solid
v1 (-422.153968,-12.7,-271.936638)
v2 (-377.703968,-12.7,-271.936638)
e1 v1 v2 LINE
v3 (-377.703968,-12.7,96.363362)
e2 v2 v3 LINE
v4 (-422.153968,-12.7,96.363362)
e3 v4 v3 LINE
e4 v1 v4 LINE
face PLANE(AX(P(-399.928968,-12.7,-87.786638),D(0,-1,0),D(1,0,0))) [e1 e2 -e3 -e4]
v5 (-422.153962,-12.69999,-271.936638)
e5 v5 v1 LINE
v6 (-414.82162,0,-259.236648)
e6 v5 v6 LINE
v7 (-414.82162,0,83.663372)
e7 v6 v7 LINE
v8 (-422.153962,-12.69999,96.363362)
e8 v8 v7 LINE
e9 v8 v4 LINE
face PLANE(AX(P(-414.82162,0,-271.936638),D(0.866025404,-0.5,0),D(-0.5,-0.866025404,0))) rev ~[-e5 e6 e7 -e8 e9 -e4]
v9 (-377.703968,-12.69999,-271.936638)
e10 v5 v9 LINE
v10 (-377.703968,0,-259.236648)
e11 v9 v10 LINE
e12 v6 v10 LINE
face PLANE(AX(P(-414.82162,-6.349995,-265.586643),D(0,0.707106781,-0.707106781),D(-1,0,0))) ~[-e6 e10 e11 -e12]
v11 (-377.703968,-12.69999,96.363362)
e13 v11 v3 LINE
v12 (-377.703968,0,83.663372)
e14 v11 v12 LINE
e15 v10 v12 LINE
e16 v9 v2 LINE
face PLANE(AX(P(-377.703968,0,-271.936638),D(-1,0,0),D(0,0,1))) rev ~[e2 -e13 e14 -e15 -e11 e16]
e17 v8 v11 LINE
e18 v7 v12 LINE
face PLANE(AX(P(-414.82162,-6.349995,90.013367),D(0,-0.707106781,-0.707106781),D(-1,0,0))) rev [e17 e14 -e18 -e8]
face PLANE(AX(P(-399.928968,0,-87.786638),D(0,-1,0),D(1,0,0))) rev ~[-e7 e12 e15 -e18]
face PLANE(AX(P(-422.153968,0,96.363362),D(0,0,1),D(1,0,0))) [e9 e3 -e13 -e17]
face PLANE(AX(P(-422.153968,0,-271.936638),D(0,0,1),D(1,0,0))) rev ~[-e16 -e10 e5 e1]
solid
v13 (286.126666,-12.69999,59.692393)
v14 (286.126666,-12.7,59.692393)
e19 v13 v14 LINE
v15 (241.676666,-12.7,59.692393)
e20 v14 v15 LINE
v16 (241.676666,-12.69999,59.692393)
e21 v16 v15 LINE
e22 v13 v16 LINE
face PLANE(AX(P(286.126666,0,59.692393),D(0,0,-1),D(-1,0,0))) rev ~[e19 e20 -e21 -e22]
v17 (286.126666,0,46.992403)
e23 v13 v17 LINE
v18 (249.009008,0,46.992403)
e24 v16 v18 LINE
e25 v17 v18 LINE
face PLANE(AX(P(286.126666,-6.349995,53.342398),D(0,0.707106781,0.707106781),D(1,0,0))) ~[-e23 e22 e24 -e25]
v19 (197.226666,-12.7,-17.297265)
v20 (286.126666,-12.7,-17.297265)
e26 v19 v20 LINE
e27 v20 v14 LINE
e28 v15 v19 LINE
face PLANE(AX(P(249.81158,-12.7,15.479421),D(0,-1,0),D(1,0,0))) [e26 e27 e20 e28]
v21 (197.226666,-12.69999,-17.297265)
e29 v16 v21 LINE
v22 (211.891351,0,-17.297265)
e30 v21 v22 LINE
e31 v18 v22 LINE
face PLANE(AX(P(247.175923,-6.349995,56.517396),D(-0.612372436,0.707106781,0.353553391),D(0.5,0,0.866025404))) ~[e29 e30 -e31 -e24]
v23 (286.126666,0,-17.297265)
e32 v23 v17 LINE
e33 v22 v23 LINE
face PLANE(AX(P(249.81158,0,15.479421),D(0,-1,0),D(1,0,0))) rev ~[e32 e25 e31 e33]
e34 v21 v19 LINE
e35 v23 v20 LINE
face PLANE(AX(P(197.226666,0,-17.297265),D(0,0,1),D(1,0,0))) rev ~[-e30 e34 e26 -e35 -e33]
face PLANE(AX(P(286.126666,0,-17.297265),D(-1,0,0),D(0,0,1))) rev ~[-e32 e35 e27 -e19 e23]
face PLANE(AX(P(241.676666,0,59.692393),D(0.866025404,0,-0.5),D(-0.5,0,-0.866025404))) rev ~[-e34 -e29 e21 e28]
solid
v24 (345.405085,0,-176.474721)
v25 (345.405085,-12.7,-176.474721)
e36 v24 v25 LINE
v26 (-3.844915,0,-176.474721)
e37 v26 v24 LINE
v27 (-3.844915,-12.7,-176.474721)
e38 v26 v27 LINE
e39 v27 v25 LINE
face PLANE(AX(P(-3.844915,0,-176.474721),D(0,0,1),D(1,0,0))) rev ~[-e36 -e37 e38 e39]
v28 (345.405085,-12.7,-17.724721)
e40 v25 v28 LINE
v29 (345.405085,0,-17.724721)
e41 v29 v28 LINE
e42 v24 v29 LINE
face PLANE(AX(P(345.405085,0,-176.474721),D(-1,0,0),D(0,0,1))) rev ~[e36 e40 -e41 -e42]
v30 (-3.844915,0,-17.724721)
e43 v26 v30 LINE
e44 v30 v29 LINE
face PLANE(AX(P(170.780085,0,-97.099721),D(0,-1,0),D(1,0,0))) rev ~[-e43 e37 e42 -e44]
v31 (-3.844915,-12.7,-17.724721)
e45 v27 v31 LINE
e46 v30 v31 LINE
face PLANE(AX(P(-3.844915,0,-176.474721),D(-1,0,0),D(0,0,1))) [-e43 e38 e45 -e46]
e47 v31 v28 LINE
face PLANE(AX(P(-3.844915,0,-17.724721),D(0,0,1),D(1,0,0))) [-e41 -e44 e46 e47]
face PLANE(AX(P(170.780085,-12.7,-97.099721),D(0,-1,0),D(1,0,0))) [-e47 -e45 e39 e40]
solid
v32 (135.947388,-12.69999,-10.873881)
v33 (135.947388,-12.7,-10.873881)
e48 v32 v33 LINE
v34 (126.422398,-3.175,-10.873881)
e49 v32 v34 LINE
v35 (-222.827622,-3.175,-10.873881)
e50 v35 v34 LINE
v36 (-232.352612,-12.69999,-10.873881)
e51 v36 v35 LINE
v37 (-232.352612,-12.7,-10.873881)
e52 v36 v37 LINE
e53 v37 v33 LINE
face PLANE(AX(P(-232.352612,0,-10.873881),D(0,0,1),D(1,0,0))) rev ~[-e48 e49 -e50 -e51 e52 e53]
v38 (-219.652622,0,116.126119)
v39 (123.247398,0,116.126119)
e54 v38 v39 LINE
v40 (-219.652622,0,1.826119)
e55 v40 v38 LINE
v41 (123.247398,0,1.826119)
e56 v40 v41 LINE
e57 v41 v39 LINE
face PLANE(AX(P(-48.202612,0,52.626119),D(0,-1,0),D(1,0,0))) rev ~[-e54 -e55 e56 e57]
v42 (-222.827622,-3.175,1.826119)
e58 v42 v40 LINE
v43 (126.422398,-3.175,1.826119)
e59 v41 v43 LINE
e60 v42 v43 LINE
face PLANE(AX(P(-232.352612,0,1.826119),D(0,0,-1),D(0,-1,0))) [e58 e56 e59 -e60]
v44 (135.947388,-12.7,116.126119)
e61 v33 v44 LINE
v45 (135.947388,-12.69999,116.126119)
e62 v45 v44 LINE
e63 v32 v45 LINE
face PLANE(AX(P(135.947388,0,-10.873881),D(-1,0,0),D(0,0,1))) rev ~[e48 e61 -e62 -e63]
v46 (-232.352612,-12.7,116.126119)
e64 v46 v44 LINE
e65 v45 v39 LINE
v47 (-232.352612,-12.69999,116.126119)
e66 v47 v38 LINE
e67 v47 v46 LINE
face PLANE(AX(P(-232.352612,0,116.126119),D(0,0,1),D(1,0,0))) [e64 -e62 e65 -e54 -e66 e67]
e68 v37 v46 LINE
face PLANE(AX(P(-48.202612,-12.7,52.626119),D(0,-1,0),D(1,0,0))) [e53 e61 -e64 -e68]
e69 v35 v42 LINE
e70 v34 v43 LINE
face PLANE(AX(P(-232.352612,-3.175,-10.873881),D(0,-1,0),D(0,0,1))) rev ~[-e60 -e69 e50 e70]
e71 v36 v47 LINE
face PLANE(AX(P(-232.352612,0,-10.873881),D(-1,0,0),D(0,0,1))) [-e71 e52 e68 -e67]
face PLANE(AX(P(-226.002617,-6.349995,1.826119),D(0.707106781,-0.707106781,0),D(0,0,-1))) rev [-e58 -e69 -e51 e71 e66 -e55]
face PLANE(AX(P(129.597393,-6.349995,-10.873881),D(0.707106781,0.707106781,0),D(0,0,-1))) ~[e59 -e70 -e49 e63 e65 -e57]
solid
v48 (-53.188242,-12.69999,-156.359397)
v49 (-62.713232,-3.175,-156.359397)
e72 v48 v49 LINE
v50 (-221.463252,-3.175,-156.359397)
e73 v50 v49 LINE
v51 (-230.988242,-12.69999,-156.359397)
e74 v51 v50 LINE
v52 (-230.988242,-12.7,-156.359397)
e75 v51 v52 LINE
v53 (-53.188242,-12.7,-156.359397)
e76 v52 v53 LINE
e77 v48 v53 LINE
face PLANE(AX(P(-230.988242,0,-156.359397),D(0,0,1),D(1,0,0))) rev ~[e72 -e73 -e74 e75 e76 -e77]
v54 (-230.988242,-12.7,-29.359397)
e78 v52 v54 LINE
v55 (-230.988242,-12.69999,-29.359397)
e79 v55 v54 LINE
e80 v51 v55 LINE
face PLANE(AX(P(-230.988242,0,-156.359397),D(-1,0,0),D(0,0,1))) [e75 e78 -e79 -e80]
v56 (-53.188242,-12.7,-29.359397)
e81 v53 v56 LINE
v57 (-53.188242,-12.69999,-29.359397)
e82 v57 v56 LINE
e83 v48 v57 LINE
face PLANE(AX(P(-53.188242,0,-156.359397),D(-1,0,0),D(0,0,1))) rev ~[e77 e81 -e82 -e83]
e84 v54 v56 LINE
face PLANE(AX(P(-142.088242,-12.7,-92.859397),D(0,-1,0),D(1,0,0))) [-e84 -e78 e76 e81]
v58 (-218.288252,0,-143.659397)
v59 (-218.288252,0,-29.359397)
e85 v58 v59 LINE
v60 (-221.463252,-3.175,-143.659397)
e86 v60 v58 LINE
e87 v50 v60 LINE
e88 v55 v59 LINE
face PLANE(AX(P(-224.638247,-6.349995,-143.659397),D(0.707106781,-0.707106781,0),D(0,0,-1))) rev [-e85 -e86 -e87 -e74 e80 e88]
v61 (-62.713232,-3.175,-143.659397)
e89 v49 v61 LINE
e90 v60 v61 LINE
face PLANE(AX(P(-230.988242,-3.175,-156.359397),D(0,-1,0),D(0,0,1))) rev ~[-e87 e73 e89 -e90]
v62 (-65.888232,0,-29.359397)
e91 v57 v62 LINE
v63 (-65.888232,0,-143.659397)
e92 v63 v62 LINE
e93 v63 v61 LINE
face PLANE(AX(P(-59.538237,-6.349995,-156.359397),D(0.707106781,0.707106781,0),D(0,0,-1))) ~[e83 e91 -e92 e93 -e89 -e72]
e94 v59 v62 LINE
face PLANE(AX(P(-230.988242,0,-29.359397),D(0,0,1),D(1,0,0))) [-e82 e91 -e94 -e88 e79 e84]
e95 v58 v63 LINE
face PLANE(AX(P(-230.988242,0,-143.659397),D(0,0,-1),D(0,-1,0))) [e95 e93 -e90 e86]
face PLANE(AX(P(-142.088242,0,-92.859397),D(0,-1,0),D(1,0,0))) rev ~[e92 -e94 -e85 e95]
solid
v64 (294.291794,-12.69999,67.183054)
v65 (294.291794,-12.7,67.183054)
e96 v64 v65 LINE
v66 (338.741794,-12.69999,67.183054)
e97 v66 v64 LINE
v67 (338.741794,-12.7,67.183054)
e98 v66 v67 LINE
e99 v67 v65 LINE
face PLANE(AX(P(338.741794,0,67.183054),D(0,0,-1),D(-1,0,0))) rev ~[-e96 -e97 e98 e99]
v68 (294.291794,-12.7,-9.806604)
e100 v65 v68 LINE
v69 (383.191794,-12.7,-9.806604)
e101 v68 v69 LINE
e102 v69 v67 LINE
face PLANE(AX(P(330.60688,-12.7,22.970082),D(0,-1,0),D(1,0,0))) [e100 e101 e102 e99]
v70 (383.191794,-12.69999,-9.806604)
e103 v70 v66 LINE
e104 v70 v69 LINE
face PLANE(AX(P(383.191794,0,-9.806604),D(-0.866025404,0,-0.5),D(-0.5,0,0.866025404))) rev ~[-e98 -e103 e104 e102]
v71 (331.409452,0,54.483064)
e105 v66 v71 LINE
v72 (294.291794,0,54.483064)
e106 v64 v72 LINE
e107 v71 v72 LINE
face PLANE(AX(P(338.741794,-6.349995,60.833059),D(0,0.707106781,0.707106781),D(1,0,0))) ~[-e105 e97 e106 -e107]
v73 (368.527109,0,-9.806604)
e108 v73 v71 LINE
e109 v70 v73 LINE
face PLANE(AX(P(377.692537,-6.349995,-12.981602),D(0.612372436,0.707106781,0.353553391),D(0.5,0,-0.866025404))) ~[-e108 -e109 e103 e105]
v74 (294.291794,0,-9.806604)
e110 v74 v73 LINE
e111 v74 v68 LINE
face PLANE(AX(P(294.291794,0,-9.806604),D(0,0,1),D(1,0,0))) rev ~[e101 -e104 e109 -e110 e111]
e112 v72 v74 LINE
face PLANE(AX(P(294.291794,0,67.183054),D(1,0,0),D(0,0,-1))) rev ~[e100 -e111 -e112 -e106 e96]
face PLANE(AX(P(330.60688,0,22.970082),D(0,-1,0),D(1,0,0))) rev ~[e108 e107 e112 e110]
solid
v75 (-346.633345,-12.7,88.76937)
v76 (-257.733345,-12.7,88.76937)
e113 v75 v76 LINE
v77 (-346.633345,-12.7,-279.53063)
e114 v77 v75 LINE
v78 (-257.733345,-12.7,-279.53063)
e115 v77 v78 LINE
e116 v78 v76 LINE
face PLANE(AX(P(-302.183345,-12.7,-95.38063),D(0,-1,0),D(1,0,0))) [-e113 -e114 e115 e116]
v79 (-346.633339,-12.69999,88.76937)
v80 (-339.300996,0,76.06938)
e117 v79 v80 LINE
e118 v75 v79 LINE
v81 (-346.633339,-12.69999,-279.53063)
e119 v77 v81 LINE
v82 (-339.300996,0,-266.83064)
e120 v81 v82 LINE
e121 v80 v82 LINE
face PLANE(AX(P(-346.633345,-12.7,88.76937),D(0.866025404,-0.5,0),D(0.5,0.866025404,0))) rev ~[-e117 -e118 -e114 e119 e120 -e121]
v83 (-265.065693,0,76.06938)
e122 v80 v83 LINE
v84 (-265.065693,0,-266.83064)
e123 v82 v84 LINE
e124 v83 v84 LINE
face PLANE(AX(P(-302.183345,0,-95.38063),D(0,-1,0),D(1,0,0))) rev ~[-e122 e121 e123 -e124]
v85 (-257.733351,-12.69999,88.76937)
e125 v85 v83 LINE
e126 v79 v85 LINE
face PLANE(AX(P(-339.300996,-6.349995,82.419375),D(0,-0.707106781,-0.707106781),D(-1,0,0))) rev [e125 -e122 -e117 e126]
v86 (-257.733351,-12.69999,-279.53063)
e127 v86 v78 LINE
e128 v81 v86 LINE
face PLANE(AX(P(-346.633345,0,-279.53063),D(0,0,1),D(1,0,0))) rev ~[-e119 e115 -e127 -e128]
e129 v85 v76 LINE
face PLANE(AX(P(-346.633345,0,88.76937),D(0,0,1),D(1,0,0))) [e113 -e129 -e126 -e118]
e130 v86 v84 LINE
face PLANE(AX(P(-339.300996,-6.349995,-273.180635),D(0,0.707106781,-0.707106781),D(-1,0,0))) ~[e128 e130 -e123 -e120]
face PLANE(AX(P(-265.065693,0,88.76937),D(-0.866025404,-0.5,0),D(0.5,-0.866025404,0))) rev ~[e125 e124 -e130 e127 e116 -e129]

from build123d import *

# Parameters (mm, degrees)
F0_W      = 368.3
F0_H      = 127
F1_DEPTH  = 12.7
F2_W      = 177.8
F2_H      = 127
F3_DEPTH  = 12.7
F4_SIZE   = 12.69999
F5_SIZE   = 12.69999
F6_W      = 3.175
F6_H      = 12.7
F7_DEPTH  = 368.3
F8_W      = 3.175
F8_H      = 12.7
F9_DEPTH  = 368.3
F10_SIZE  = 12.69999
F11_SIZE  = 12.69999
F12_W     = 349.25
F12_H     = 158.75
F13_DEPTH = 12.7
F14_W     = 44.45
F14_H     = 368.3
F15_DEPTH = 12.7
F17_DEPTH = 12.7
F18_SIZE  = 12.69999
F20_DEPTH = 368.3
F21_SIZE  = 12.69999
F22_W     = 88.9
F22_H     = 368.3
F23_DEPTH = 12.7
F25_DEPTH = 368.3
F27_DEPTH = 12.7
F28_SIZE  = 12.69999
F29_SIZE  = 12.69999


# Not quite as in the source:
# - a fillet or chamfer is up to 0.001 mm smaller than in the source, because OpenCascade refuses the exact size
# - a feature names something its author has since deleted; it is built from what else it names


with BuildPart() as f1:
    # F0 (on Front) → F1 (new body)
    with BuildSketch(Plane.XZ):
        with Locations((-48.202611506, 52.6261187441)):
            Rectangle(F0_W, F0_H)
    extrude(amount=F1_DEPTH)

    # F4 (size 12.7 in the source; OpenCascade refuses exactly that, so slightly less here)
    f4_edges = [f1.edges().sort_by_distance(p)[0] for p in [
        (135.947388, 0, 52.626119),
    ]]
    chamfer(f4_edges, length=F4_SIZE)

    # F6 (on face) → F7 (cut)
    with BuildSketch(Plane(origin=(-232.352611506, 0, 0), x_dir=(0, -1, 0), z_dir=(-1, 0, 0))):
        with Locations((1.5875, -4.5238812559)):
            Rectangle(F6_W, F6_H)
    extrude(amount=-F7_DEPTH, mode=Mode.SUBTRACT)

    # F10 (size 12.7 in the source; OpenCascade refuses exactly that, so slightly less here)
    f10_edges = [f1.edges().sort_by_distance(p)[0] for p in [
        (-232.352612, 0, 58.976119),
    ]]
    chamfer(f10_edges, length=F10_SIZE)


with BuildPart() as f3:
    # F2 (on Front) → F3 (new body)
    with BuildSketch(Plane.XZ):
        with Locations((-142.0882418752, -92.8593969557)):
            Rectangle(F2_W, F2_H)
    extrude(amount=F3_DEPTH)

    # F5 (size 12.7 in the source; OpenCascade refuses exactly that, so slightly less here)
    f5_edges = [f3.edges().sort_by_distance(p)[0] for p in [
        (-53.188242, 0, -92.859397),
    ]]
    chamfer(f5_edges, length=F5_SIZE)

    # F8 (on face) → F9 (cut)
    with BuildSketch(Plane(origin=(-230.9882418752, 0, 0), x_dir=(0, -1, 0), z_dir=(-1, 0, 0))):
        with Locations((1.5875, -150.0093969557)):
            Rectangle(F8_W, F8_H)
    extrude(amount=-F9_DEPTH, mode=Mode.SUBTRACT)

    # F11 (size 12.7 in the source; OpenCascade refuses exactly that, so slightly less here)
    f11_edges = [f3.edges().sort_by_distance(p)[0] for p in [
        (-230.988242, 0, -86.509397),
    ]]
    chamfer(f11_edges, length=F11_SIZE)


with BuildPart() as f13:
    # F12 (on Front) → F13 (new body)
    with BuildSketch(Plane.XZ):
        with Locations((170.78008526, -97.0997214928)):
            Rectangle(F12_W, F12_H)
    extrude(amount=F13_DEPTH)


with BuildPart() as f15:
    # F14 (on Front) → F15 (new body)
    with BuildSketch(Plane.XZ):
        with Locations((-399.9289679691, -87.7866384085)):
            Rectangle(F14_W, F14_H)
    extrude(amount=F15_DEPTH)

    # F19 (on face) → F20 (cut)
    with BuildSketch(Plane(origin=(0, 0, -271.9366384085), x_dir=(1, 0, 0), z_dir=(0, 0, -1))):
        Polygon((-414.8216195504, 0), (-422.1539679691, 12.7), (-422.1539679691, 0), align=None)
    extrude(amount=-F20_DEPTH, mode=Mode.SUBTRACT)

    # F21 (size 12.7 in the source; OpenCascade refuses exactly that, so slightly less here)
    f21_edges = [f15.edges().sort_by_distance(p)[0] for p in [
        (-396.262794, 0, 96.363362),
        (-396.262794, 0, -271.936638),
    ]]
    chamfer(f21_edges, length=F21_SIZE)


with BuildPart() as f17:
    # F16 (on Front) → F17 (new body)
    with BuildSketch(Plane.XZ):
        Polygon((294.2917943001, 67.1830539138), (294.2917943001, -9.8066044826), (383.1917943001, -9.8066044826), (338.7417943001, 67.1830539138), align=None)
    extrude(amount=F17_DEPTH)

    # F18 (size 12.7 in the source; OpenCascade refuses exactly that, so slightly less here)
    f18_edges = [f17.edges().sort_by_distance(p)[0] for p in [
        (360.966794, 0, 28.688225),
        (316.516794, 0, 67.183054),
    ]]
    chamfer(f18_edges, length=F18_SIZE)


with BuildPart() as f23:
    # F22 (on Front) → F23 (new body)
    with BuildSketch(Plane.XZ):
        with Locations((-302.1833447643, -95.3806303442)):
            Rectangle(F22_W, F22_H)
    extrude(amount=F23_DEPTH)

    # F24 (on face) → F25 (cut)
    with BuildSketch(Plane.XY.offset(88.7693696558)):
        Polygon((-346.6333447643, 0), (-346.6333447643, -12.7), (-339.3009963456, 0), align=None)
        Polygon((-265.065693183, 0), (-257.7333447643, -12.7), (-257.7333447643, 0), align=None)
    extrude(amount=-F25_DEPTH, mode=Mode.SUBTRACT)

    # F29 (size 12.7 in the source; OpenCascade refuses exactly that, so slightly less here)
    f29_edges = [f23.edges().sort_by_distance(p)[0] for p in [
        (-302.183345, 0, 88.76937),
        (-302.183345, 0, -279.53063),
    ]]
    chamfer(f29_edges, length=F29_SIZE)


with BuildPart() as f27:
    # F26 (on Front) → F27 (new body)
    with BuildSketch(Plane.XZ):
        Polygon((197.2266658425, -17.2972651758), (286.1266658425, -17.2972651758), (286.1266658425, 59.6923932206), (241.6766658425, 59.6923932206), align=None)
    extrude(amount=F27_DEPTH)

    # F28 (size 12.7 in the source; OpenCascade refuses exactly that, so slightly less here)
    f28_edges = [f27.edges().sort_by_distance(p)[0] for p in [
        (219.451666, 0, 21.197564),
        (263.901666, 0, 59.692393),
    ]]
    chamfer(f28_edges, length=F28_SIZE)


solid = Compound([f1.part, f3.part, f13.part, f15.part, f17.part, f23.part, f27.part])
